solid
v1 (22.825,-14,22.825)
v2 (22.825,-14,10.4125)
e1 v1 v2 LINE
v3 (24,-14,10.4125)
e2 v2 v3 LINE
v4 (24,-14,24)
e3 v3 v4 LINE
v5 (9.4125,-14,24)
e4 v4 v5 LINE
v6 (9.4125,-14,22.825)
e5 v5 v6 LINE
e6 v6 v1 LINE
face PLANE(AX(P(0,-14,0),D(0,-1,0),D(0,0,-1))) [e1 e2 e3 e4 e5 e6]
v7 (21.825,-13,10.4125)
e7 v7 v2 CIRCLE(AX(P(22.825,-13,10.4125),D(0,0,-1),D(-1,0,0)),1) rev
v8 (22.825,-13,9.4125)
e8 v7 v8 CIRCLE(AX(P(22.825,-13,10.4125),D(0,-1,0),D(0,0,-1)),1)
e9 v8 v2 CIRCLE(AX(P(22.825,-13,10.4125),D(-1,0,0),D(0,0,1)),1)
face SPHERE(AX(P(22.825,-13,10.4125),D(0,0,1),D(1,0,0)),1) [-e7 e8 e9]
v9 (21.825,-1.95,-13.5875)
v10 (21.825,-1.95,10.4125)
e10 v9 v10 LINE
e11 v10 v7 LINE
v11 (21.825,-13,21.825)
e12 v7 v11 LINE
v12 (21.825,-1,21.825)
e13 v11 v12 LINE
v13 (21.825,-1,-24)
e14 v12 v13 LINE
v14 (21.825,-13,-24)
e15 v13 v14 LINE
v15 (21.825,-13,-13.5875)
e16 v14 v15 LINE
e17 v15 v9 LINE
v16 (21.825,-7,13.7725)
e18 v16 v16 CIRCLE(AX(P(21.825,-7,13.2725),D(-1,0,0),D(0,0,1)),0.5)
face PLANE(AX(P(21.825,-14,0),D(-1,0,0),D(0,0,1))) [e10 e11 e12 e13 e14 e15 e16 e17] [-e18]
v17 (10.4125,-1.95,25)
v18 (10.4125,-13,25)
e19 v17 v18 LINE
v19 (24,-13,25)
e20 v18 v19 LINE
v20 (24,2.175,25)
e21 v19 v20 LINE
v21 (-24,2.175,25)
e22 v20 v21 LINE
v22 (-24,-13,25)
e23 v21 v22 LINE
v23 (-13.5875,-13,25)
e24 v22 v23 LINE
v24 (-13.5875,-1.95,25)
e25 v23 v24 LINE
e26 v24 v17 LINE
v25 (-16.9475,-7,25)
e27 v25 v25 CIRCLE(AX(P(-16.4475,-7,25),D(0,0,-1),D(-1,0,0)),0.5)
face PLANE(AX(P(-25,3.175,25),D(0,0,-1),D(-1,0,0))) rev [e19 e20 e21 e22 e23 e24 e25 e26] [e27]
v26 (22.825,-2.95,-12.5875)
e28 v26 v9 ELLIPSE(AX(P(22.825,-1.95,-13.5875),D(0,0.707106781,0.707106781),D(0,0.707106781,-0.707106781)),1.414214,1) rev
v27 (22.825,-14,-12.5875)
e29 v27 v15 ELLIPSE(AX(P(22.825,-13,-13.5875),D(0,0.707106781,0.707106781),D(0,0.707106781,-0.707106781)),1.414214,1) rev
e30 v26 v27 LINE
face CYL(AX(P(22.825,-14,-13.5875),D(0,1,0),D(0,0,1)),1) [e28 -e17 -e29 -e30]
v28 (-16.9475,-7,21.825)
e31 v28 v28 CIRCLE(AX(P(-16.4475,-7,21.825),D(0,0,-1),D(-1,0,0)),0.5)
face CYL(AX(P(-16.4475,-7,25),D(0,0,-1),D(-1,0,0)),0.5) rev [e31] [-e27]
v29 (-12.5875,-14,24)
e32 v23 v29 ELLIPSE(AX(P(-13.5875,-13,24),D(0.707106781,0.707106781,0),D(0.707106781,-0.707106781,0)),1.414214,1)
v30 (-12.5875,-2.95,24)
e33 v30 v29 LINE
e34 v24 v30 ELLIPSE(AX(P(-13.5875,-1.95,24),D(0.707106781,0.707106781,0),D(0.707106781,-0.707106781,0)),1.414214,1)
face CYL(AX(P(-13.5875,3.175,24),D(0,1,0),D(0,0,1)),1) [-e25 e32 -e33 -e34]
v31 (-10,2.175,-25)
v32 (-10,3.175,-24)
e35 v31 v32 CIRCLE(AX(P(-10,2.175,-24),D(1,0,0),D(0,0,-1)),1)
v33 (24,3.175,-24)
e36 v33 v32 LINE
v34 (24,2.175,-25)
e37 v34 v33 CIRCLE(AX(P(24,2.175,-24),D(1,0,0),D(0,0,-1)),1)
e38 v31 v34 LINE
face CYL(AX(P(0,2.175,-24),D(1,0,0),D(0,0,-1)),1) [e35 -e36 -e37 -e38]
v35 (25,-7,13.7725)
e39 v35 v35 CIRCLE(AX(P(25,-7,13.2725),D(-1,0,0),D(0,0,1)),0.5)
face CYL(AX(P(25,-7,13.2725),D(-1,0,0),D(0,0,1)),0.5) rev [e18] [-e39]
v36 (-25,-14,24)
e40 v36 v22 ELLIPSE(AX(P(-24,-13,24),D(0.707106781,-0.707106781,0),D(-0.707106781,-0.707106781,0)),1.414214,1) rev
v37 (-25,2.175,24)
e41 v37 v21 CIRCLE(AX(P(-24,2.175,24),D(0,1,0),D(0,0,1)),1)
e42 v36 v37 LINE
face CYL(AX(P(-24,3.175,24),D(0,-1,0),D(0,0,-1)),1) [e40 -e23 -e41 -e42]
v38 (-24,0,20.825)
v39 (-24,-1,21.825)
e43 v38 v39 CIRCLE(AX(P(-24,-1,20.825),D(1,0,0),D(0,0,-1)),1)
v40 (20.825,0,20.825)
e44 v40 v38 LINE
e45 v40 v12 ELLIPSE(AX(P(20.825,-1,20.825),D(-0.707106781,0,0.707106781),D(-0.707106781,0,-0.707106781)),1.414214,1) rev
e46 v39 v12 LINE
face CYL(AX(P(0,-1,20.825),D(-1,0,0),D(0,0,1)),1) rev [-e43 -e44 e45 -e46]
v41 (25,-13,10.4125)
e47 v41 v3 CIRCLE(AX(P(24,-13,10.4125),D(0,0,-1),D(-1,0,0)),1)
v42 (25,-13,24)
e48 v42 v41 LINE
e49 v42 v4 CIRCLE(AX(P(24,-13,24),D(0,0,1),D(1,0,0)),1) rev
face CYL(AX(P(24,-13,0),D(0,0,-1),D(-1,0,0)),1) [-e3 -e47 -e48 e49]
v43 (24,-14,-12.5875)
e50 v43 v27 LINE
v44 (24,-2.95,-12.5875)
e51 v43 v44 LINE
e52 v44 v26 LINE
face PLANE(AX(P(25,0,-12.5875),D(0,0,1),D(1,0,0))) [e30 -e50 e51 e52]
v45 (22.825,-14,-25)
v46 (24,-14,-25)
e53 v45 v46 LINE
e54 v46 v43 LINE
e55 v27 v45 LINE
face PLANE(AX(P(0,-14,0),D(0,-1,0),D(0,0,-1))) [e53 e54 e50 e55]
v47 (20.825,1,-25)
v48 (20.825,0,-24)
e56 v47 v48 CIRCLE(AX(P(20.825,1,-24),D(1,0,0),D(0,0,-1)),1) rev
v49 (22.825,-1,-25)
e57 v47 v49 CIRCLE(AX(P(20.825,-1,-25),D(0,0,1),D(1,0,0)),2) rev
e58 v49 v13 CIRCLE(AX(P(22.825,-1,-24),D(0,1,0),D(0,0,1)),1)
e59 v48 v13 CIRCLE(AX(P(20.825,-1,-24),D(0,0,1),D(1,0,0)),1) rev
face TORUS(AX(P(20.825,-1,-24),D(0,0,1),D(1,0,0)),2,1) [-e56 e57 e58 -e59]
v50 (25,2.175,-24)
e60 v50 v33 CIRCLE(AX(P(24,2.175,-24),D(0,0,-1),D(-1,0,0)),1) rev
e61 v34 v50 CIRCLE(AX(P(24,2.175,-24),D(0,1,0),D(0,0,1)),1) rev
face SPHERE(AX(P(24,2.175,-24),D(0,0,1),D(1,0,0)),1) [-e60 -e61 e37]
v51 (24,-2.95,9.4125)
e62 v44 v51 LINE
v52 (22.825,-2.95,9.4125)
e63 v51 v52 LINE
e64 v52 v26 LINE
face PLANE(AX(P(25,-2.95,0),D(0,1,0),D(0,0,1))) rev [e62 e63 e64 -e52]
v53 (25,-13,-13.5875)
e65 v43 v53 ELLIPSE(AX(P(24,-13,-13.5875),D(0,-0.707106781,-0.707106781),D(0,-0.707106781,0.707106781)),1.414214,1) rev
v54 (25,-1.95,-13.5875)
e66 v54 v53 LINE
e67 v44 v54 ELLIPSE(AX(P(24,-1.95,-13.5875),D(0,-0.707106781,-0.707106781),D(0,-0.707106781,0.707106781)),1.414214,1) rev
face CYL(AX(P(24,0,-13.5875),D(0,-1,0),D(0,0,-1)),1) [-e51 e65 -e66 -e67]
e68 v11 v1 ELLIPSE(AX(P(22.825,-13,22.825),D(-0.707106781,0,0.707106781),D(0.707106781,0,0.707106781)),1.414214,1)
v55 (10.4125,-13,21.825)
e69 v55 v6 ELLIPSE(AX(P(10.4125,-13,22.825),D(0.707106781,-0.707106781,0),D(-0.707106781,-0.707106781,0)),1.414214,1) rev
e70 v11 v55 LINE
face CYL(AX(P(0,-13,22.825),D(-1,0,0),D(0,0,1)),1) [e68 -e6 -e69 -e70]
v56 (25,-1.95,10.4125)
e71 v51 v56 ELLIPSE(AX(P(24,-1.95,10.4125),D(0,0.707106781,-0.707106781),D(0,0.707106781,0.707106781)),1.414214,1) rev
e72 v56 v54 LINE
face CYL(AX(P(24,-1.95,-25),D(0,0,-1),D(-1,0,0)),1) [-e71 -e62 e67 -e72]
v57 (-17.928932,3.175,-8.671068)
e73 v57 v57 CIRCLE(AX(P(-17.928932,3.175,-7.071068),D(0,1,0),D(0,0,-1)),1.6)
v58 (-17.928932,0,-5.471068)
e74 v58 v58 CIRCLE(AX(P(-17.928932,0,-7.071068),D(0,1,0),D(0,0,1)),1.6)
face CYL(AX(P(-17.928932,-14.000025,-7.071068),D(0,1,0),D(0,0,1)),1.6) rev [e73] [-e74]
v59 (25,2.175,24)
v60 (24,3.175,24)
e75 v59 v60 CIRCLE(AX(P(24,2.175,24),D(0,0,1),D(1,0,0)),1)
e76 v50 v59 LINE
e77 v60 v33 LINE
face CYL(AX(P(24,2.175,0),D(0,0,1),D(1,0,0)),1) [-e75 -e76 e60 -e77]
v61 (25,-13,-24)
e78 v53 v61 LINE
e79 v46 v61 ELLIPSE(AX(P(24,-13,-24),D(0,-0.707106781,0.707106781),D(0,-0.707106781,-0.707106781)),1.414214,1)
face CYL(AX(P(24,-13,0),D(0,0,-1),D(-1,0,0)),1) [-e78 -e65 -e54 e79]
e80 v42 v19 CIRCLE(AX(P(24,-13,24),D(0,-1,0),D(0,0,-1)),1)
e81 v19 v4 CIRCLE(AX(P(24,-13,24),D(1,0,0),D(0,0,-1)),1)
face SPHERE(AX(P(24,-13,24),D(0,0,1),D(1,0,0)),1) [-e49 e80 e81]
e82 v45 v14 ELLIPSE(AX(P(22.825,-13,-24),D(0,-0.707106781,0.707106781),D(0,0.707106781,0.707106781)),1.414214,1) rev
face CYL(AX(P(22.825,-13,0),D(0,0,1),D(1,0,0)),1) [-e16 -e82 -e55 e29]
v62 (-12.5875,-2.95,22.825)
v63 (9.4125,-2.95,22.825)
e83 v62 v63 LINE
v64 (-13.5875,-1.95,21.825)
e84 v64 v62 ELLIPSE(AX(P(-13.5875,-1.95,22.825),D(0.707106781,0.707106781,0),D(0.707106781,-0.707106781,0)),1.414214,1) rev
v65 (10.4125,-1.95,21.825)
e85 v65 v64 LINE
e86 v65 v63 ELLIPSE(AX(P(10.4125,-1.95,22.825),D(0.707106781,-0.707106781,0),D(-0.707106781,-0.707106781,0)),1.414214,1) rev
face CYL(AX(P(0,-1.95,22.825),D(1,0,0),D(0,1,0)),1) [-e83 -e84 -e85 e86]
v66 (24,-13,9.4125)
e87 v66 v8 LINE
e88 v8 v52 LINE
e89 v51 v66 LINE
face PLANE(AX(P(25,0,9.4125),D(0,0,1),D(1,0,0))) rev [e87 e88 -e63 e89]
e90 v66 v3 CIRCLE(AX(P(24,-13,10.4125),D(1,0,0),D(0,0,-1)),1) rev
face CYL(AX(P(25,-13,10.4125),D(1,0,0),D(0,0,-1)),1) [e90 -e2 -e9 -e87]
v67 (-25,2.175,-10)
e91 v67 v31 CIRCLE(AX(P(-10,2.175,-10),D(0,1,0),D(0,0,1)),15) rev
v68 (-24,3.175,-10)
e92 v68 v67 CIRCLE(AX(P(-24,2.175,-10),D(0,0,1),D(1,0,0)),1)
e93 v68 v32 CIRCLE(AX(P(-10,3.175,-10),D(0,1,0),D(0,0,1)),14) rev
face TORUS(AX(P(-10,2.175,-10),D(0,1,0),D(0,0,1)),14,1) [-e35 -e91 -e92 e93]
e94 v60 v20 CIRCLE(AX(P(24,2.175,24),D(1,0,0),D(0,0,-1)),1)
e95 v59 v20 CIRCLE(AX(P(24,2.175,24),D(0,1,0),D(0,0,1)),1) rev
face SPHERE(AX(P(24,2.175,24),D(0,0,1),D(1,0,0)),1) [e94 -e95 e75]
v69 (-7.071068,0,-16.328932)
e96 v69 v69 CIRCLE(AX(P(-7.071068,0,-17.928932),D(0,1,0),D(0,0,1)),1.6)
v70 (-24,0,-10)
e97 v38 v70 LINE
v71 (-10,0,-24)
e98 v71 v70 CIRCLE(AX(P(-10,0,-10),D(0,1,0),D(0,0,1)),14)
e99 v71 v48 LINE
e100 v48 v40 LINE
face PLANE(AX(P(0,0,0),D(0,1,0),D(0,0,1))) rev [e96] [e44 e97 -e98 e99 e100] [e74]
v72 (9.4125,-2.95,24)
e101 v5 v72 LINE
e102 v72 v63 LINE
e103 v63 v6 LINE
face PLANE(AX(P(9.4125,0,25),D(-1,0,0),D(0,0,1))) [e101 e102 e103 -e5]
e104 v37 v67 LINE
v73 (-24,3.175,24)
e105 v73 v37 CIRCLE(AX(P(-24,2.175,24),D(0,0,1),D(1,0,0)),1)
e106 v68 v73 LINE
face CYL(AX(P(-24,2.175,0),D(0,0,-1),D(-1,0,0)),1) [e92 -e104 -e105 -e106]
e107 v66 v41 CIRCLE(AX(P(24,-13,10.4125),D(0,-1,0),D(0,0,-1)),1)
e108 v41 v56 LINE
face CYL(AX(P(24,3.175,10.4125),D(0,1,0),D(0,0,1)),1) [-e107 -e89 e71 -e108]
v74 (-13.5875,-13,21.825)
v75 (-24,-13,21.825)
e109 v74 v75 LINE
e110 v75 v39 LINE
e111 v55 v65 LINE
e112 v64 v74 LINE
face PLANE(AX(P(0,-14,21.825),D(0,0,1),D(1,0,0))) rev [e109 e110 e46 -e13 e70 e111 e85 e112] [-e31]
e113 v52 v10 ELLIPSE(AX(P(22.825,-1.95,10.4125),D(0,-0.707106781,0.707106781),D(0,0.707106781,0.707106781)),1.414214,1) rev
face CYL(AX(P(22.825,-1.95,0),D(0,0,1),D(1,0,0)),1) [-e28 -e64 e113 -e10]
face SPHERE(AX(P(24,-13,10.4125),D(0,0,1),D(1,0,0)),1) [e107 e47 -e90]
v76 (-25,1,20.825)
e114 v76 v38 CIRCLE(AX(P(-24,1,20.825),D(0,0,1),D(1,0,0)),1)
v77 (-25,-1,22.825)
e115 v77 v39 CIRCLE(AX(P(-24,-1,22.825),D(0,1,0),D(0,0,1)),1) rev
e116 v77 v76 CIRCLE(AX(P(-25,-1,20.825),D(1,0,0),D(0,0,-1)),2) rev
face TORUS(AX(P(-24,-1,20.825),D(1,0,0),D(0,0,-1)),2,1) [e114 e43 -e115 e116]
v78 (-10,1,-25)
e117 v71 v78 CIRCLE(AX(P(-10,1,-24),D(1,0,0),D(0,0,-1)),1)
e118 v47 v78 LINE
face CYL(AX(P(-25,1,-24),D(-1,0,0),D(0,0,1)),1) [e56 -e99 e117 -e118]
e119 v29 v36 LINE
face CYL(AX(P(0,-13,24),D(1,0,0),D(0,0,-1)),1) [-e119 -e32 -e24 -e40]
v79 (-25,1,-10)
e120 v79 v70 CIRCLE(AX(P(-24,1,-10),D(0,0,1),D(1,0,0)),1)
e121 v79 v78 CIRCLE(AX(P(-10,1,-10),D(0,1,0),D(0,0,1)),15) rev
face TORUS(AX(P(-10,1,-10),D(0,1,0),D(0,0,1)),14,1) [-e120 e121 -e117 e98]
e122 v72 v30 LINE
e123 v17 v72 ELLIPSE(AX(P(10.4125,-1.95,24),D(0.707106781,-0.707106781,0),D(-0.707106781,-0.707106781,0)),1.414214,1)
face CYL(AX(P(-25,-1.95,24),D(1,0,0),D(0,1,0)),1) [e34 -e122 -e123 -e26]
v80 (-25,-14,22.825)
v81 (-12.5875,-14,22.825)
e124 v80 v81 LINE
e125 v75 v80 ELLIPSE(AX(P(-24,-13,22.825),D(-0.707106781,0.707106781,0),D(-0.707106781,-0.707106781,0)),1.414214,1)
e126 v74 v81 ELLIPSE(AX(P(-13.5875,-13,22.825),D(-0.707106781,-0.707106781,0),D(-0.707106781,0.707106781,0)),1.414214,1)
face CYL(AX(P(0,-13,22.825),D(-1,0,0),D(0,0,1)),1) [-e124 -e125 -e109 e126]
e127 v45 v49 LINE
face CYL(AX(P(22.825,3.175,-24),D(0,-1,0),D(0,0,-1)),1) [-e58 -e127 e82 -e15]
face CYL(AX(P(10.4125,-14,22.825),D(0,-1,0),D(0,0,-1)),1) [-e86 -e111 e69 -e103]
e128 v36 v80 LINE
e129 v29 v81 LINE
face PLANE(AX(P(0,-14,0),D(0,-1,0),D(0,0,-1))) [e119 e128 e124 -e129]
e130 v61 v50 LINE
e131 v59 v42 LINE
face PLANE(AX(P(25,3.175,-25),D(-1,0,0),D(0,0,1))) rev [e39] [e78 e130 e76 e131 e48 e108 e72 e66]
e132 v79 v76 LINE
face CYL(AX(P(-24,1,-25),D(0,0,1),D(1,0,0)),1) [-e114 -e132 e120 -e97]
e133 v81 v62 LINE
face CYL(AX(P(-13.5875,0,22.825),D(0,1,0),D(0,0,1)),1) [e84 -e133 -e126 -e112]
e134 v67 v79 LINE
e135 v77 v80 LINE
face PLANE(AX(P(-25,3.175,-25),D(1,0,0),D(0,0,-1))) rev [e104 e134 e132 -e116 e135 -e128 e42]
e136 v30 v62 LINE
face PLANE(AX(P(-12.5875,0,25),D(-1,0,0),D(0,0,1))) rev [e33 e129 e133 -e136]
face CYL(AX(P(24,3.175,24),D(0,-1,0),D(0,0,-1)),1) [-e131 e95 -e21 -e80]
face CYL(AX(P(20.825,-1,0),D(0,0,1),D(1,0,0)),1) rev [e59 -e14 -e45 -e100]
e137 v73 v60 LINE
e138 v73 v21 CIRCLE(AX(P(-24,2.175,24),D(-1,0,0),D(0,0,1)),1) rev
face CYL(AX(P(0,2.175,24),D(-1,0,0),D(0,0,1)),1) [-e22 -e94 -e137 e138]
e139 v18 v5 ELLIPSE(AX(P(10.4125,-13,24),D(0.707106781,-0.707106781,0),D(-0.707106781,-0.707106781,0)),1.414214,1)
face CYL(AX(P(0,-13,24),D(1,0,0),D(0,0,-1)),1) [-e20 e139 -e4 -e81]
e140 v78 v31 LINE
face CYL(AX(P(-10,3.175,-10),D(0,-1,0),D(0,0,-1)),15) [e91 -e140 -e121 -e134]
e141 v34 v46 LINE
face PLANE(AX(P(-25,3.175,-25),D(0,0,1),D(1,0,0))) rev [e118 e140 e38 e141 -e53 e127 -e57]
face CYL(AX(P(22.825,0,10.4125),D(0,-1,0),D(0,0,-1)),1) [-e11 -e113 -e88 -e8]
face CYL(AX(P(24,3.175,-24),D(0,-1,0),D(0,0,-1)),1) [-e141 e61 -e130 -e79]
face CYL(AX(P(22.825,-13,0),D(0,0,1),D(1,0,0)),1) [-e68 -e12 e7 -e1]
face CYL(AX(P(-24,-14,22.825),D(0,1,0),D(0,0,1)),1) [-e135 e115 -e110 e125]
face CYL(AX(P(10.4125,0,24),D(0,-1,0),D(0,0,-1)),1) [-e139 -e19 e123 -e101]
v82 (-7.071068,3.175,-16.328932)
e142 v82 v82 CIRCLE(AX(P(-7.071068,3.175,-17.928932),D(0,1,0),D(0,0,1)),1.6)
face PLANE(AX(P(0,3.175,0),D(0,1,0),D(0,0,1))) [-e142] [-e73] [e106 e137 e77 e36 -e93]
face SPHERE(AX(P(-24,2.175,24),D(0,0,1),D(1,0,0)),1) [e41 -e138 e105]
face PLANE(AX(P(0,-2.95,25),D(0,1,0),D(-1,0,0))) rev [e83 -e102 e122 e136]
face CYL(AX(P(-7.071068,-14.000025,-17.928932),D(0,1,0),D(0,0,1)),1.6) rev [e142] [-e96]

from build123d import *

# Parameters (mm, degrees)
SKETCH1_W           = 50
SKETCH1_H           = 50
BOSS_EXTRUDE1_DEPTH = 3.175
SKETCH2_W           = 3.175
SKETCH2_H           = 46.825
BOSS_EXTRUDE2_DEPTH = 14
SKETCH3_W           = 22
SKETCH3_H           = 8.1
SKETCH3_H_2         = 2.95
SKETCH3_R           = 0.5
CUT_EXTRUDE1_DEPTH  = 55.896089342
SKETCH4_W           = 22
SKETCH4_H           = 8.1
SKETCH4_H_2         = 2.95
SKETCH4_R           = 0.5
CUT_EXTRUDE2_DEPTH  = 55.896089342
SKETCH5_R           = 1.6
CUT_EXTRUDE3_DEPTH  = 40.306241553
FILLET1_R           = 1
FILLET2_R           = 15


with BuildPart() as part:
    # Sketch1 → Boss-Extrude1 (new body)
    with BuildSketch(Plane(origin=(0, 0, 0), x_dir=(1, 0, 0), z_dir=(0, 1, 0))):
        Rectangle(SKETCH1_W, SKETCH1_H)
    extrude(amount=BOSS_EXTRUDE1_DEPTH)

    # Sketch2 → Boss-Extrude2 (add)
    with BuildSketch(Plane(origin=(0, 0, 0), x_dir=(-1, 0, 0), z_dir=(0, -1, 0))):
        Polygon((-25, -25), (25, -25), (25, -21.825), (-21.825, -21.825), (-25, -21.825), align=None)
        with Locations((-23.4125, 1.5875)):
            Rectangle(SKETCH2_W, SKETCH2_H)
    extrude(amount=BOSS_EXTRUDE2_DEPTH)

    # Sketch3 → Cut-Extrude1 (cut, through all)
    with BuildSketch(Plane(origin=(0, 0, 21.825), x_dir=(-1, 0, 0), z_dir=(0, 0, -1))):
        with Locations((1.5875, -7)):
            Rectangle(SKETCH3_W, SKETCH3_H)
        with Locations((1.5875, -12.525)):
            Rectangle(SKETCH3_W, SKETCH3_H_2)
        with Locations((16.4475, -7)):
            Circle(SKETCH3_R)
    extrude(amount=-CUT_EXTRUDE1_DEPTH, mode=Mode.SUBTRACT)

    # Sketch4 → Cut-Extrude2 (cut, through all)
    with BuildSketch(Plane.ZY.offset(-21.825)):
        with Locations((-1.5875, -7)):
            Rectangle(SKETCH4_W, SKETCH4_H)
        with Locations((-1.5875, -12.525)):
            Rectangle(SKETCH4_W, SKETCH4_H_2)
        with Locations((13.2725, -7)):
            Circle(SKETCH4_R)
    extrude(amount=-CUT_EXTRUDE2_DEPTH, mode=Mode.SUBTRACT)

    # Sketch5 → Cut-Extrude3 (cut, through all)
    with BuildSketch(Plane(origin=(0, 3.175, 0), x_dir=(1, 0, 0), z_dir=(0, 1, 0))):
        with Locations(Location((-7.071067812, 17.928932188, 0), (0, 0, 270))):
            Circle(SKETCH5_R)
        with Locations(Location((-17.928932188, 7.071067812, 0), (0, 0, 270))):
            Circle(SKETCH5_R)
    extrude(amount=-CUT_EXTRUDE3_DEPTH, mode=Mode.SUBTRACT)

    # Fillet1
    fillet1_edges = [part.edges().sort_by_distance(p)[0] for p in [
        (-25, 3.175, 0),
        (0, 3.175, 25),
        (-1.5875, 0, -25),
        (-1.5875, 0, 21.825),
        (-25, -7, 21.825),
        (21.825, -14, -18.79375),
        (21.825, -7, -25),
        (-18.79375, -14, 21.825),
        (25, -14, -18.79375),
        (17.20625, -14, 25),
        (21.825, 0, -1.5875),
        (15.61875, -14, 21.825),
        (-18.79375, -14, 25),
        (25, 3.175, 0),
        (9.4125, -8.475, 21.825),
        (-1.5875, -2.95, 25),
        (-12.5875, -8.475, 25),
        (9.4125, -8.475, 25),
        (-12.5875, -8.475, 21.825),
        (-1.5875, -2.95, 21.825),
        (-25, 0, -1.5875),
        (21.825, -14, 15.61875),
        (25, -14, 17.20625),
        (21.825, -8.475, -12.5875),
        (25, -2.95, -1.5875),
        (25, -8.475, 9.4125),
        (23.4125, -14, 9.4125),
        (25, -8.475, -12.5875),
        (21.825, -8.475, 9.4125),
        (21.825, -2.95, -1.5875),
        (0, 3.175, -25),
        (25, -5.4125, 25),
        (-25, -5.4125, 25),
        (25, -5.4125, -25),
    ]]
    fillet(fillet1_edges, radius=FILLET1_R)

    # Fillet2
    # the kernel refuses this fillet: 15 mm, written as the material it takes off along each edge
    with BuildSketch(Plane(origin=(-10, 3.175, -10), x_dir=(0, 0, -1), z_dir=(1, 0, 0))) as fillet2_piece_1:
        with BuildLine():
            CenterArc((14, -1), 1, 0, 90)
            Line((15, -1), (15, 0))
            Line((15, 0), (14, 0))
        make_face()
    revolve(axis=Axis((-10, 3.175, -10), (0, 1, 0)), revolution_arc=90, mode=Mode.SUBTRACT)
    with BuildSketch(Plane(origin=(-10, 0, -10), x_dir=(-1, 0, 0), z_dir=(0, 0, 1))) as fillet2_piece_2:
        with BuildLine():
            CenterArc((14, -1), 1, 0, 90)
            Line((15, -1), (15, 0))
            Line((15, 0), (14, 0))
        make_face()
    revolve(axis=Axis((-10, 0, -10), (0, -1, 0)), revolution_arc=90, mode=Mode.SUBTRACT)
    with BuildSketch(Plane(origin=(-25, 0, -25), x_dir=(1, 0, 0), z_dir=(0, 1, 0))) as fillet2_piece_3:
        with BuildLine():
            CenterArc((FILLET2_R, -FILLET2_R), FILLET2_R, 90, 90)
            Line((0, -FILLET2_R), (0, 0))
            Line((0, 0), (FILLET2_R, 0))
        make_face()
    extrude(amount=3.175, mode=Mode.SUBTRACT)


solid = part.part
